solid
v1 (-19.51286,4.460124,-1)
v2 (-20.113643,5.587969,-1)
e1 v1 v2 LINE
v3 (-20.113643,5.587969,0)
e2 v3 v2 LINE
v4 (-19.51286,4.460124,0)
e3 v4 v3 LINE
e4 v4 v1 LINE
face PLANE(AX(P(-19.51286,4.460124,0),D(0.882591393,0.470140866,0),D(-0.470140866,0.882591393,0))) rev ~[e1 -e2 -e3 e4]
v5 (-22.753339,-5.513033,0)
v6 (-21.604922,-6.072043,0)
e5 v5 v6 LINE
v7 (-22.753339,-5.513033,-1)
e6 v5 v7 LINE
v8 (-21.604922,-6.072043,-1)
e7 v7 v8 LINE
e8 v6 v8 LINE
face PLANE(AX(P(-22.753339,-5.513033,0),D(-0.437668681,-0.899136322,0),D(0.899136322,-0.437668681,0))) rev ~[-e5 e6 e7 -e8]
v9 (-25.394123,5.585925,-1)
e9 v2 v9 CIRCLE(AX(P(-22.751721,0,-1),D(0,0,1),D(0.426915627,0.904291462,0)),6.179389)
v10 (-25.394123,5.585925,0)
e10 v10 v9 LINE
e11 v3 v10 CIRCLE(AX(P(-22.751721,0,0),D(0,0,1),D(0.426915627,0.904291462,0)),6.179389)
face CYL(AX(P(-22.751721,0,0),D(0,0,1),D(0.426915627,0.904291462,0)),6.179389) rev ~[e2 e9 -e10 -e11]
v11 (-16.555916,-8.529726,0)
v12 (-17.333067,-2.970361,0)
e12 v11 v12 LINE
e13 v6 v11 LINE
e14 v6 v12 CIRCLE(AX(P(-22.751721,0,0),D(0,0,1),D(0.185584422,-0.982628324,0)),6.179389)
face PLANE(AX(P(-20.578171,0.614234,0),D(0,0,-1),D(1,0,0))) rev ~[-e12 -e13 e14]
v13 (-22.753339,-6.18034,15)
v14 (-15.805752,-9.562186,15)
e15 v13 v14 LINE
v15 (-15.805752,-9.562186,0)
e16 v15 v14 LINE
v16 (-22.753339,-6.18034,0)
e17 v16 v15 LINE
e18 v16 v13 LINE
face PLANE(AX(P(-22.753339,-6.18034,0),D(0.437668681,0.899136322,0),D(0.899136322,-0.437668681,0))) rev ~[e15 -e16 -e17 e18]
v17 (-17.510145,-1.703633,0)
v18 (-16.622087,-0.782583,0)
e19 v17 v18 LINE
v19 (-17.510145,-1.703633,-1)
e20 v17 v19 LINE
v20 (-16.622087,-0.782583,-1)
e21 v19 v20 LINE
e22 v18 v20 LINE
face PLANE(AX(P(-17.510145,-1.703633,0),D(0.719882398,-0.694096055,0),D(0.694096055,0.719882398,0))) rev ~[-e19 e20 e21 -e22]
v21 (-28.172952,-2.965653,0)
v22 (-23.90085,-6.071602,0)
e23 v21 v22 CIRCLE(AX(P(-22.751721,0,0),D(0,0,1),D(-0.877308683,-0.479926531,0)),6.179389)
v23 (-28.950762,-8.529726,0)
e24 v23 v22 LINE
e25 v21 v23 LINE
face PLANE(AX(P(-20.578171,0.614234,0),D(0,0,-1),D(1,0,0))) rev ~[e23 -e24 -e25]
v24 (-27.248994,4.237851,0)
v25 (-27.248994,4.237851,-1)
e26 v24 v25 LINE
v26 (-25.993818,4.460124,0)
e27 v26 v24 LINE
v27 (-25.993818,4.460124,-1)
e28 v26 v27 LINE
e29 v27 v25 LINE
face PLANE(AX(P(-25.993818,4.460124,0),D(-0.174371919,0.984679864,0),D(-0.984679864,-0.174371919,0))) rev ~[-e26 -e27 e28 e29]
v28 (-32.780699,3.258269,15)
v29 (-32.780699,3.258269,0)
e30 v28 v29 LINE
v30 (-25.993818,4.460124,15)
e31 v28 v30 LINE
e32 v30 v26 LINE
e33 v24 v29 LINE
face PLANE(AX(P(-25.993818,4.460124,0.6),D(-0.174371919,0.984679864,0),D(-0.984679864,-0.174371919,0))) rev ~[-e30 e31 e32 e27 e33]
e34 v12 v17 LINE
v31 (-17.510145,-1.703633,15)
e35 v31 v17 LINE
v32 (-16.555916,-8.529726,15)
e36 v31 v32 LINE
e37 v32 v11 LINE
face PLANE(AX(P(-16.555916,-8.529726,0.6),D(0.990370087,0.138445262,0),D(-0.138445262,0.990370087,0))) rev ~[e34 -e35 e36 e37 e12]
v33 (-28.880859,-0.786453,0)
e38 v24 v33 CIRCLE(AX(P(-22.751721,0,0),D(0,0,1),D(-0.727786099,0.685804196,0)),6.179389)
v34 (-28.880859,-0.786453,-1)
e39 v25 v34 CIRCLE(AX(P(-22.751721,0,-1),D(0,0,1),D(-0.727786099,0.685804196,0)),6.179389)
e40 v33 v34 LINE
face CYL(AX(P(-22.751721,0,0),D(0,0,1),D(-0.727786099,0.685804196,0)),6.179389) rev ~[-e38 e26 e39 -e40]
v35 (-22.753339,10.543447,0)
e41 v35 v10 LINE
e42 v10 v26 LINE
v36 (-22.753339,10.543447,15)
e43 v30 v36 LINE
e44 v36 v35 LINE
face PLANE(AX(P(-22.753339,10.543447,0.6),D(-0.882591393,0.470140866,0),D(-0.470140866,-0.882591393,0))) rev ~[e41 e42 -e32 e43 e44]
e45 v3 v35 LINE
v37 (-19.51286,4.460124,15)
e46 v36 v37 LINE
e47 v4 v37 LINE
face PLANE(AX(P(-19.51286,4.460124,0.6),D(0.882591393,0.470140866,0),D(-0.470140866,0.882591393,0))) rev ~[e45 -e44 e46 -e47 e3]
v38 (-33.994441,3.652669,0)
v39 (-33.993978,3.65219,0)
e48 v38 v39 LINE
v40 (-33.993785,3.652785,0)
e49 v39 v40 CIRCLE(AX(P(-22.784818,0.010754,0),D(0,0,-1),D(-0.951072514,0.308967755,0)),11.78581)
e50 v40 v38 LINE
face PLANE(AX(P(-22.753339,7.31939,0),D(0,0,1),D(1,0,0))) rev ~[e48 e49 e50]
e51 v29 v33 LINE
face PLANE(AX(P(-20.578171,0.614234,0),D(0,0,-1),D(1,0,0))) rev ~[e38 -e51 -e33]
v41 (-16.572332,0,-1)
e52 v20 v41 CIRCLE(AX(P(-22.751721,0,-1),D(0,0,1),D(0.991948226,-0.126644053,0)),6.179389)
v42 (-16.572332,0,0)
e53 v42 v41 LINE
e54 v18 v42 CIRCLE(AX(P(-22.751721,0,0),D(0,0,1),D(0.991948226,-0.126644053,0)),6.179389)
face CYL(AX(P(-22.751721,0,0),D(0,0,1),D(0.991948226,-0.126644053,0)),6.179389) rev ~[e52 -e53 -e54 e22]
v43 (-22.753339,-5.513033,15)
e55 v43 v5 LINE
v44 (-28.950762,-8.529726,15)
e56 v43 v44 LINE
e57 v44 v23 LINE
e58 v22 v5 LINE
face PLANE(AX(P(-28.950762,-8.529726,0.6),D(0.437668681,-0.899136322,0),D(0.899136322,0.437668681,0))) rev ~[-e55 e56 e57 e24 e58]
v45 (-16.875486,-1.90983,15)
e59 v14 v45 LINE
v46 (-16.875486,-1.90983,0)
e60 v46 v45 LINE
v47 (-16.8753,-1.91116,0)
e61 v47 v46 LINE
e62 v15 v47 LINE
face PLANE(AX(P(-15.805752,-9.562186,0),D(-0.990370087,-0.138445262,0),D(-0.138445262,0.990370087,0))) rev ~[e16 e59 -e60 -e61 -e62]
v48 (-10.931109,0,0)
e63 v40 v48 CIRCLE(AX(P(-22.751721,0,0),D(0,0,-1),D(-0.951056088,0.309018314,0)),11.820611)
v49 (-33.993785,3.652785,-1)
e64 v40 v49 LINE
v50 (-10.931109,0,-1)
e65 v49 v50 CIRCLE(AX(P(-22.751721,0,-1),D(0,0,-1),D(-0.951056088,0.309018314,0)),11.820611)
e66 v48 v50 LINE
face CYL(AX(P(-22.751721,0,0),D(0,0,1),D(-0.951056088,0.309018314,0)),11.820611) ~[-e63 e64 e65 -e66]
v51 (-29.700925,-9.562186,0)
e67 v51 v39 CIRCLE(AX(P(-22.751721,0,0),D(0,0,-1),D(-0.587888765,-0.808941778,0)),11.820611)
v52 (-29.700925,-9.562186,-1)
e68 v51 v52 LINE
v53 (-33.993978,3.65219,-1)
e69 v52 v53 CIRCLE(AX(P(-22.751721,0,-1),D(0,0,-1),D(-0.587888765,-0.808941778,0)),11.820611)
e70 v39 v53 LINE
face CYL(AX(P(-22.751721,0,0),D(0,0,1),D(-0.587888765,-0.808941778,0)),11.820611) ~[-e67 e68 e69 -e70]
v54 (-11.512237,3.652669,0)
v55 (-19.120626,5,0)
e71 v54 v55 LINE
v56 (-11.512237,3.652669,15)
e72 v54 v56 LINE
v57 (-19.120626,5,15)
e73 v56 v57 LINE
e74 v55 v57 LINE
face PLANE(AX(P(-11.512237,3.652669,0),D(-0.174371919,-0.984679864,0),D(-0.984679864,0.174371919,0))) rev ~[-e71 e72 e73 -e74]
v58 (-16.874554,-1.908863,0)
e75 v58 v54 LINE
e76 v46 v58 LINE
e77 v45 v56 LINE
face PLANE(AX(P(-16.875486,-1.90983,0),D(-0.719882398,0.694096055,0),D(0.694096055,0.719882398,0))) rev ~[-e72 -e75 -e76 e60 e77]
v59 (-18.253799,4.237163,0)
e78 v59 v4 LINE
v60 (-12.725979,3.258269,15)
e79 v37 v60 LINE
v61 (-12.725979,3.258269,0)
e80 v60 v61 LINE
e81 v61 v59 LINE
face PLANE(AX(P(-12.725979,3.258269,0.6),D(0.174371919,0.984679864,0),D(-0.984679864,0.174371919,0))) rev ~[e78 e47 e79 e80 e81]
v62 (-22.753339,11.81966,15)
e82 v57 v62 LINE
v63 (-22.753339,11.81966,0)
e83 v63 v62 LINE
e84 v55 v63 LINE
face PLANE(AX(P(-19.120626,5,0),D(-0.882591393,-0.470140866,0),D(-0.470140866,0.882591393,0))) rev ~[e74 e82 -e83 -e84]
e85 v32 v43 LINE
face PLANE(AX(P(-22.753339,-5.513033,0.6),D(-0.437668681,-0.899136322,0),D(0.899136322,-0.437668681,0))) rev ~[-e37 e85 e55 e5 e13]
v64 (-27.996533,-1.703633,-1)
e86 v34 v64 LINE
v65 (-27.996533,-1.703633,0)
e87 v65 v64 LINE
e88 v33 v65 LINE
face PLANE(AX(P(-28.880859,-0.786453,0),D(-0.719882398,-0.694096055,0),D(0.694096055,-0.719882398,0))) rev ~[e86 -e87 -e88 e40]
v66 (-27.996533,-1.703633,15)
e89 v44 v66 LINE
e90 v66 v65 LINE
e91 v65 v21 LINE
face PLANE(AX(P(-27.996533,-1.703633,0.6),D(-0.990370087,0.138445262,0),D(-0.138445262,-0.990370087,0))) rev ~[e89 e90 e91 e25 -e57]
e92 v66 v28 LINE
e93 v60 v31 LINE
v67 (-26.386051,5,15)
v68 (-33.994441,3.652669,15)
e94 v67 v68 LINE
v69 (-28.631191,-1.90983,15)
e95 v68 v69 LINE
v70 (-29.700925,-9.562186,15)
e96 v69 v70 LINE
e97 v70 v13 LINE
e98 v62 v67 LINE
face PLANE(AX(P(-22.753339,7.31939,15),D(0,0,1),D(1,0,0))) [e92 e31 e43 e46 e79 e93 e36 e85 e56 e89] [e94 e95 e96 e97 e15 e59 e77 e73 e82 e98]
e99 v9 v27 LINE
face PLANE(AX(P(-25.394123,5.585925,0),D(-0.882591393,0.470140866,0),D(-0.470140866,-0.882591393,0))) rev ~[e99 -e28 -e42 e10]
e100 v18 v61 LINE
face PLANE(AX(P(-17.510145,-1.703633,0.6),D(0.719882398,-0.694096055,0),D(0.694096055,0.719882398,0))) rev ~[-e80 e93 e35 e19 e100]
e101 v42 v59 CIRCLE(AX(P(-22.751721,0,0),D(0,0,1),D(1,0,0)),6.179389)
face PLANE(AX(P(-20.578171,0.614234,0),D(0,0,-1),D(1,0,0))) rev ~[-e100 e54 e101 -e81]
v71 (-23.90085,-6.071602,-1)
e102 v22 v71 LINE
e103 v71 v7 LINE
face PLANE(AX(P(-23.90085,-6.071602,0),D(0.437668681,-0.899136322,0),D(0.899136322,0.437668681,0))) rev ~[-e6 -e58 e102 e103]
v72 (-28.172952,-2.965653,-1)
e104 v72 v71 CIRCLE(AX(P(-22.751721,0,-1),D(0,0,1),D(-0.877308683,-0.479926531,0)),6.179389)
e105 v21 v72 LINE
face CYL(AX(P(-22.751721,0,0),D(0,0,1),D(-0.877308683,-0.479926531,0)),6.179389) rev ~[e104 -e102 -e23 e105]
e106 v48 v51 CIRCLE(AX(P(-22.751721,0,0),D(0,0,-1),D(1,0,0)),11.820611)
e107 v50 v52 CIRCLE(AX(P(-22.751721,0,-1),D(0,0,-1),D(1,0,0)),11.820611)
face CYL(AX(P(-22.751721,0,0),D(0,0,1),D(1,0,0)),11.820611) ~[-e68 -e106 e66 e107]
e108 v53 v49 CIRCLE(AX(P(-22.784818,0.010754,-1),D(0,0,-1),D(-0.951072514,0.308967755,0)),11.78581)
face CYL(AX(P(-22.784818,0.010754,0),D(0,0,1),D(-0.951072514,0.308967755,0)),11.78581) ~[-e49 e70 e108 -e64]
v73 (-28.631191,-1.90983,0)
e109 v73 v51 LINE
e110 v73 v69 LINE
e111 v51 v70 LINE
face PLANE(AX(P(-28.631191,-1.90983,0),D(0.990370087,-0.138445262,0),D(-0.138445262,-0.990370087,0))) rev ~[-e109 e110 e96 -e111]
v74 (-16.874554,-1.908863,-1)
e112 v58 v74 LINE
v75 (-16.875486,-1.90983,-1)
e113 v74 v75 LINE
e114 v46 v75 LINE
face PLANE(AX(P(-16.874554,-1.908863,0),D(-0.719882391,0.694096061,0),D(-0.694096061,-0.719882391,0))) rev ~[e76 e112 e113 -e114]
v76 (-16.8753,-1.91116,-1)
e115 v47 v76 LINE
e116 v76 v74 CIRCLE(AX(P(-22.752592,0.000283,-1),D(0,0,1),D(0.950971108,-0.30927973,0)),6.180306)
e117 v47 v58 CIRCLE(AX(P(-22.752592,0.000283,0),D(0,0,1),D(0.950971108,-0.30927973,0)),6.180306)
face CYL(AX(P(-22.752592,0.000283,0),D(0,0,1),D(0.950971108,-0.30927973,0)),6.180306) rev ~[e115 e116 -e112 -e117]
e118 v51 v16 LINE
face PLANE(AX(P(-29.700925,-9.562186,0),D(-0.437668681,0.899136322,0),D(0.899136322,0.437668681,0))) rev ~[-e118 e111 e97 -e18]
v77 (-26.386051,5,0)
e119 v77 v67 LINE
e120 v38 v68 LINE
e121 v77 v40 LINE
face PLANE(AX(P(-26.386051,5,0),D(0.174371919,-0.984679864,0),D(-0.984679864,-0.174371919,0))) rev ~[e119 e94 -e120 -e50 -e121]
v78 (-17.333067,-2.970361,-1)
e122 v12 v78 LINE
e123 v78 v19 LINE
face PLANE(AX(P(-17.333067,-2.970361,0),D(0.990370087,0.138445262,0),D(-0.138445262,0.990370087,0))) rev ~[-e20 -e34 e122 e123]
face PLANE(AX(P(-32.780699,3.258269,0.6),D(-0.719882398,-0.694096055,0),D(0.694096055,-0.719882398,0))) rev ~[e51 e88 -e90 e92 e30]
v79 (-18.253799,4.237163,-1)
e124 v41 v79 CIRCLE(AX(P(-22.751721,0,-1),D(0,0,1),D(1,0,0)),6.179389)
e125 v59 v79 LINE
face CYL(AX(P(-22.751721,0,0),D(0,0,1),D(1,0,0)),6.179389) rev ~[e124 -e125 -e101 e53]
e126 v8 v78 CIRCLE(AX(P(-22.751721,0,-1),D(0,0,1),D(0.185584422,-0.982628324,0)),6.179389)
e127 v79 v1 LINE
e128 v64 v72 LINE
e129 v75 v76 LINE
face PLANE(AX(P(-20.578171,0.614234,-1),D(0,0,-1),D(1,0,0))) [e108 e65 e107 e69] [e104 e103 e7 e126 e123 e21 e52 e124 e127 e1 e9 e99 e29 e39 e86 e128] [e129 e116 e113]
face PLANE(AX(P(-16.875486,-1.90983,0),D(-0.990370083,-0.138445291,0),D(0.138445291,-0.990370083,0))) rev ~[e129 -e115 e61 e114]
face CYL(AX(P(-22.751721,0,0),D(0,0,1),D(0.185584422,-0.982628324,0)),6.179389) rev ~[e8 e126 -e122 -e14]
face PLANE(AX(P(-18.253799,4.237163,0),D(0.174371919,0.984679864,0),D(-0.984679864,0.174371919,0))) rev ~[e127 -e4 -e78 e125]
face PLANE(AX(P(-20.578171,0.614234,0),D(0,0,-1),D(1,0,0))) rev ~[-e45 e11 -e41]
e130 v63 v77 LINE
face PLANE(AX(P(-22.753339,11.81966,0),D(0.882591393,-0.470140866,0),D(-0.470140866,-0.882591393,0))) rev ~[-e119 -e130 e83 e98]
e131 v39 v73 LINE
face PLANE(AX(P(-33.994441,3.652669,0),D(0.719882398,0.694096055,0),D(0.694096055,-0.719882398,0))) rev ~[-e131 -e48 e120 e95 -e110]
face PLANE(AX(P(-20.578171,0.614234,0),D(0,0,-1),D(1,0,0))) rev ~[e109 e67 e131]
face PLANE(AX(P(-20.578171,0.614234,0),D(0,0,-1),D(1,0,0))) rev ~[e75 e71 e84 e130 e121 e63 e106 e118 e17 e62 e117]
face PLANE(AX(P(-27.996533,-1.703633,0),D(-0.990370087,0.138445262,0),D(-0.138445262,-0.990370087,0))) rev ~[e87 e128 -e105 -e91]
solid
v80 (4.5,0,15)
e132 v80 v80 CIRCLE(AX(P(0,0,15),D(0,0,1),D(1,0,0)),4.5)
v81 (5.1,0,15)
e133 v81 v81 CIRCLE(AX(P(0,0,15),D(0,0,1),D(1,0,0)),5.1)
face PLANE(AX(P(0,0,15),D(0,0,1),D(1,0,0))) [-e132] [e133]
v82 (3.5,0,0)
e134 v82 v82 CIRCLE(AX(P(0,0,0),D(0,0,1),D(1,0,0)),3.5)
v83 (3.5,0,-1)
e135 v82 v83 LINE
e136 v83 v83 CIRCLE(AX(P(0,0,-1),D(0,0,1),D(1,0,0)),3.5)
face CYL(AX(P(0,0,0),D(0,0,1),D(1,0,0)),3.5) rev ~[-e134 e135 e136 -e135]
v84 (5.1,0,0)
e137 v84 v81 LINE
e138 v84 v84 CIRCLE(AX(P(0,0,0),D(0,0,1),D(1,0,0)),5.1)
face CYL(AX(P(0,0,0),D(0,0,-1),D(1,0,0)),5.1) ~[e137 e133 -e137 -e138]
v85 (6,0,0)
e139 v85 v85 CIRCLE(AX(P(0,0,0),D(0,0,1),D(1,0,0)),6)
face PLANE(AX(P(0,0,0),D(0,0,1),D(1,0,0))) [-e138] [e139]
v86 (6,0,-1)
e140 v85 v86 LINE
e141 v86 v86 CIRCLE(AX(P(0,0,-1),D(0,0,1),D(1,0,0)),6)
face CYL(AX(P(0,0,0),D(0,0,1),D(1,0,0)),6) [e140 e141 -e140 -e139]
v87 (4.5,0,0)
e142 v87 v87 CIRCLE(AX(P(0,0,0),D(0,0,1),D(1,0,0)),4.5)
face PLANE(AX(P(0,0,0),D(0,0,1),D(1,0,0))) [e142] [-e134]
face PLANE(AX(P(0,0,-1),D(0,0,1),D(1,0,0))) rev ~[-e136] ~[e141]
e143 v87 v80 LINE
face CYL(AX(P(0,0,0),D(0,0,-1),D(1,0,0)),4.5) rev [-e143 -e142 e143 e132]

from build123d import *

# Parameters (mm, degrees)
F0_R     = 5.1
F0_R_2   = 4.5
F1_DEPTH = 15
F0_R_3   = 6
F0_R_4   = 3.5
F2_DEPTH = 1
F4_DEPTH = 15
F5_T     = -0.6
F6_DEPTH = 25
F8_DEPTH = 1


# Not quite as in the source:
# - a feature names something its author has since deleted; it is built from what else it names


with BuildPart() as f1:
    # F0 (on Top) → F1 (new body)
    with BuildSketch(Plane.XY):
        Circle(F0_R)
        Circle(F0_R_2, mode=Mode.SUBTRACT)
    extrude(amount=F1_DEPTH)

    # F0 (on Top) → F2 (join)
    with BuildSketch(Plane.XY):
        Circle(F0_R_3)
        Circle(F0_R, mode=Mode.SUBTRACT)
        Circle(F0_R)
        Circle(F0_R_2, mode=Mode.SUBTRACT)
        Circle(F0_R_2)
        Circle(F0_R_4, mode=Mode.SUBTRACT)
    extrude(amount=-F2_DEPTH)


with BuildPart() as f4:
    # F3 (on Top) → F4 (new body)
    with BuildSketch(Plane.XY):
        Polygon((-22.7533387916, 11.8196601125), (-26.3860514316, 5), (-19.1206261516, 5), align=None)
        Polygon((-19.1206261516, 5), (-26.3860514316, 5), (-28.6311913145, -1.9098300563), (-22.7533387916, -6.1803398875), (-16.8754862687, -1.9098300563), align=None)
        Polygon((-28.6311913145, -1.9098300563), (-26.3860514316, 5), (-33.9944407131, 3.6526692678), align=None)
        Polygon((-11.5122368701, 3.6526692679), (-19.1206261516, 5), (-16.8754862687, -1.9098300563), align=None)
        Polygon((-22.7533387916, -6.1803398875), (-28.6311913145, -1.9098300563), (-29.7009252298, -9.5621863542), align=None)
        Polygon((-15.8057523534, -9.5621863542), (-16.8754862687, -1.9098300563), (-22.7533387916, -6.1803398875), align=None)
    extrude(amount=F4_DEPTH)

    # F5
    f5_openings = [f4.faces().sort_by_distance(p)[0] for p in [
        (-22.753339, 2.4e-05, 15),
    ]]
    offset(amount=F5_T, openings=f5_openings, kind=Kind.INTERSECTION)

    # F6 (cut): a face of the model
    f6_faces = [f4.faces().sort_by_distance(p)[0] for p in [
        (-22.7533387916, 1.8747e-05, 0.6),
    ]]
    extrude(f6_faces, amount=-F6_DEPTH, mode=Mode.SUBTRACT)

    # F7 (on face) → F8 (join)
    with BuildSketch(Plane(origin=(0, 0, 0), x_dir=(1, 0, 0), z_dir=(0, 0, -1))):
        with BuildLine():
            ThreePointArc((-33.9937850005, -3.6527853846), (-20.9025615121, -11.6750787208), (-10.931109278, 0))
            ThreePointArc((-10.931109278, 0), (-17.3859492082, 10.5325851378), (-29.7009252298, 9.5621863542))
            Line((-29.7009252298, 9.5621863542), (-22.7533387916, 6.1803398875))
            Line((-22.7533387916, 6.1803398875), (-15.8057523534, 9.5621863542))
            Line((-15.8057523534, 9.5621863542), (-16.8753003708, 1.9111598792))
            ThreePointArc((-16.8753003708, 1.9111598792), (-16.8749270082, 1.9100114851), (-16.87455387, 1.9088630181))
            Line((-16.87455387, 1.9088630181), (-11.5122368701, -3.6526692679))
            Line((-11.5122368701, -3.6526692679), (-19.1206261516, -5))
            Line((-19.1206261516, -5), (-22.7533387916, -11.8196601125))
            Line((-22.7533387916, -11.8196601125), (-26.3860514316, -5))
            Line((-26.3860514316, -5), (-33.9937850005, -3.6527853846))
        make_face()
        with BuildLine():
            Line((-28.6311913145, 1.9098300563), (-29.7009252298, 9.5621863542))
            ThreePointArc((-29.7009252298, 9.5621863542), (-33.9939295406, 3.6523405078), (-33.9939784806, -3.652189863))
            Line((-33.9939784806, -3.652189863), (-28.6311913145, 1.9098300563))
        make_face()
        with BuildLine():
            Line((-22.7533387916, 6.1803398875), (-29.7009252298, 9.5621863542))
            Line((-29.7009252298, 9.5621863542), (-28.6311913145, 1.9098300563))
            Line((-28.6311913145, 1.9098300563), (-33.9939784806, -3.652189863))
            ThreePointArc((-33.9939784806, -3.652189863), (-33.9938817445, -3.6524876251), (-33.9937850005, -3.6527853846))
            Line((-33.9937850005, -3.6527853846), (-26.3860514316, -5))
            Line((-26.3860514316, -5), (-22.7533387916, -11.8196601125))
            Line((-22.7533387916, -11.8196601125), (-19.1206261516, -5))
            ThreePointArc((-19.1206261516, -5), (-19.6033787354, -5.3172164164), (-20.1136429421, -5.587968612))
            Line((-20.1136429421, -5.587968612), (-22.7533387916, -10.5434468668))
            Line((-22.7533387916, -10.5434468668), (-25.3941234048, -5.5859246852))
            ThreePointArc((-25.3941234048, -5.5859246852), (-26.3846353663, -4.9986775768), (-27.2489939544, -4.2378508268))
            Line((-27.2489939544, -4.2378508268), (-32.780698951, -3.25826949))
            Line((-32.780698951, -3.25826949), (-28.8808590942, 0.7864532062))
            ThreePointArc((-28.8808590942, 0.7864532062), (-28.6287938191, 1.9091510398), (-28.1729521499, 2.9656526731))
            Line((-28.1729521499, 2.9656526731), (-28.9507619198, 8.5297255762))
            Line((-28.9507619198, 8.5297255762), (-23.9008499041, 6.0716018437))
            ThreePointArc((-23.9008499041, 6.0716018437), (-22.7529067543, 6.1793887762), (-21.6049223097, 6.0720425464))
            Line((-21.6049223097, 6.0720425464), (-16.5559156634, 8.5297255762))
            Line((-16.5559156634, 8.5297255762), (-17.333067283, 2.9703607601))
            ThreePointArc((-17.333067283, 2.9703607601), (-17.0794064137, 2.4514686566), (-16.8753003708, 1.9111598792))
            Line((-16.8753003708, 1.9111598792), (-15.8057523534, 9.5621863542))
            Line((-15.8057523534, 9.5621863542), (-22.7533387916, 6.1803398875))
        make_face()
        with BuildLine():
            Line((-16.8754862687, 1.9098300563), (-16.8753003708, 1.9111598792))
            ThreePointArc((-16.8753003708, 1.9111598792), (-17.0794064137, 2.4514686566), (-17.333067283, 2.9703607601))
            Line((-17.333067283, 2.9703607601), (-17.5101449471, 1.7036332513))
            Line((-17.5101449471, 1.7036332513), (-16.6220867723, 0.7825828526))
            ThreePointArc((-16.6220867723, 0.7825828526), (-16.7219659069, 1.351630544), (-16.87455387, 1.9088630181))
            Line((-16.87455387, 1.9088630181), (-16.8754862687, 1.9098300563))
        make_face()
        with BuildLine():
            ThreePointArc((-20.1136429421, -5.587968612), (-19.6033787354, -5.3172164164), (-19.1206261516, -5))
            ThreePointArc((-19.1206261516, -5), (-18.6693555038, -4.6388729337), (-18.2537991943, -4.2371629522))
            Line((-18.2537991943, -4.2371629522), (-19.5128597724, -4.4601235484))
            Line((-19.5128597724, -4.4601235484), (-20.1136429421, -5.587968612))
        make_face()
        with BuildLine():
            ThreePointArc((-18.2537991943, -4.2371629522), (-18.6693555038, -4.6388729337), (-19.1206261516, -5))
            Line((-19.1206261516, -5), (-11.5122368701, -3.6526692679))
            Line((-11.5122368701, -3.6526692679), (-16.87455387, 1.9088630181))
            ThreePointArc((-16.87455387, 1.9088630181), (-16.7219659069, 1.351630544), (-16.6220867723, 0.7825828526))
            Line((-16.6220867723, 0.7825828526), (-12.7259786322, -3.2582694901))
            Line((-12.7259786322, -3.2582694901), (-18.2537991943, -4.2371629522))
        make_face()
        with BuildLine():
            ThreePointArc((-21.6049223097, 6.0720425464), (-19.1211013467, 5.0003450612), (-17.333067283, 2.9703607601))
            Line((-17.333067283, 2.9703607601), (-16.5559156634, 8.5297255762))
            Line((-16.5559156634, 8.5297255762), (-21.6049223097, 6.0720425464))
        make_face()
        with BuildLine():
            Line((-22.7533387916, -10.5434468668), (-20.1136429421, -5.587968612))
            ThreePointArc((-20.1136429421, -5.587968612), (-22.7541124911, -6.1793884271), (-25.3941234048, -5.5859246852))
            Line((-25.3941234048, -5.5859246852), (-22.7533387916, -10.5434468668))
        make_face()
        with BuildLine():
            ThreePointArc((-16.5723317321, 0), (-17.0080609546, -2.2793026735), (-18.2537991943, -4.2371629522))
            Line((-18.2537991943, -4.2371629522), (-12.7259786322, -3.2582694901))
            Line((-12.7259786322, -3.2582694901), (-16.6220867723, 0.7825828526))
            ThreePointArc((-16.6220867723, 0.7825828526), (-16.5847830367, 0.39208146), (-16.5723317321, 0))
        make_face()
        with BuildLine():
            Line((-22.7533387916, 5.5130328448), (-21.6049223097, 6.0720425464))
            ThreePointArc((-21.6049223097, 6.0720425464), (-22.7529067543, 6.1793887762), (-23.9008499041, 6.0716018437))
            Line((-23.9008499041, 6.0716018437), (-22.7533387916, 5.5130328448))
        make_face()
        with BuildLine():
            ThreePointArc((-27.2489939544, -4.2378508268), (-26.3846353663, -4.9986775768), (-25.3941234048, -5.5859246852))
            Line((-25.3941234048, -5.5859246852), (-25.9938178107, -4.4601235484))
            Line((-25.9938178107, -4.4601235484), (-27.2489939544, -4.2378508268))
        make_face()
        with BuildLine():
            ThreePointArc((-28.1729521499, 2.9656526731), (-26.3854708, 4.9980702976), (-23.9008499041, 6.0716018437))
            Line((-23.9008499041, 6.0716018437), (-28.9507619198, 8.5297255762))
            Line((-28.9507619198, 8.5297255762), (-28.1729521499, 2.9656526731))
        make_face()
        with BuildLine():
            Line((-32.780698951, -3.25826949), (-27.2489939544, -4.2378508268))
            ThreePointArc((-27.2489939544, -4.2378508268), (-28.6288853053, -1.9088693886), (-28.8808590942, 0.7864532062))
            Line((-28.8808590942, 0.7864532062), (-32.780698951, -3.25826949))
        make_face()
        with BuildLine():
            Line((-27.9965326361, 1.7036332513), (-28.1729521499, 2.9656526731))
            ThreePointArc((-28.1729521499, 2.9656526731), (-28.6287938191, 1.9091510398), (-28.8808590942, 0.7864532062))
            Line((-28.8808590942, 0.7864532062), (-27.9965326361, 1.7036332513))
        make_face()
    extrude(amount=F8_DEPTH)


solid = Compound([f1.part, f4.part])
